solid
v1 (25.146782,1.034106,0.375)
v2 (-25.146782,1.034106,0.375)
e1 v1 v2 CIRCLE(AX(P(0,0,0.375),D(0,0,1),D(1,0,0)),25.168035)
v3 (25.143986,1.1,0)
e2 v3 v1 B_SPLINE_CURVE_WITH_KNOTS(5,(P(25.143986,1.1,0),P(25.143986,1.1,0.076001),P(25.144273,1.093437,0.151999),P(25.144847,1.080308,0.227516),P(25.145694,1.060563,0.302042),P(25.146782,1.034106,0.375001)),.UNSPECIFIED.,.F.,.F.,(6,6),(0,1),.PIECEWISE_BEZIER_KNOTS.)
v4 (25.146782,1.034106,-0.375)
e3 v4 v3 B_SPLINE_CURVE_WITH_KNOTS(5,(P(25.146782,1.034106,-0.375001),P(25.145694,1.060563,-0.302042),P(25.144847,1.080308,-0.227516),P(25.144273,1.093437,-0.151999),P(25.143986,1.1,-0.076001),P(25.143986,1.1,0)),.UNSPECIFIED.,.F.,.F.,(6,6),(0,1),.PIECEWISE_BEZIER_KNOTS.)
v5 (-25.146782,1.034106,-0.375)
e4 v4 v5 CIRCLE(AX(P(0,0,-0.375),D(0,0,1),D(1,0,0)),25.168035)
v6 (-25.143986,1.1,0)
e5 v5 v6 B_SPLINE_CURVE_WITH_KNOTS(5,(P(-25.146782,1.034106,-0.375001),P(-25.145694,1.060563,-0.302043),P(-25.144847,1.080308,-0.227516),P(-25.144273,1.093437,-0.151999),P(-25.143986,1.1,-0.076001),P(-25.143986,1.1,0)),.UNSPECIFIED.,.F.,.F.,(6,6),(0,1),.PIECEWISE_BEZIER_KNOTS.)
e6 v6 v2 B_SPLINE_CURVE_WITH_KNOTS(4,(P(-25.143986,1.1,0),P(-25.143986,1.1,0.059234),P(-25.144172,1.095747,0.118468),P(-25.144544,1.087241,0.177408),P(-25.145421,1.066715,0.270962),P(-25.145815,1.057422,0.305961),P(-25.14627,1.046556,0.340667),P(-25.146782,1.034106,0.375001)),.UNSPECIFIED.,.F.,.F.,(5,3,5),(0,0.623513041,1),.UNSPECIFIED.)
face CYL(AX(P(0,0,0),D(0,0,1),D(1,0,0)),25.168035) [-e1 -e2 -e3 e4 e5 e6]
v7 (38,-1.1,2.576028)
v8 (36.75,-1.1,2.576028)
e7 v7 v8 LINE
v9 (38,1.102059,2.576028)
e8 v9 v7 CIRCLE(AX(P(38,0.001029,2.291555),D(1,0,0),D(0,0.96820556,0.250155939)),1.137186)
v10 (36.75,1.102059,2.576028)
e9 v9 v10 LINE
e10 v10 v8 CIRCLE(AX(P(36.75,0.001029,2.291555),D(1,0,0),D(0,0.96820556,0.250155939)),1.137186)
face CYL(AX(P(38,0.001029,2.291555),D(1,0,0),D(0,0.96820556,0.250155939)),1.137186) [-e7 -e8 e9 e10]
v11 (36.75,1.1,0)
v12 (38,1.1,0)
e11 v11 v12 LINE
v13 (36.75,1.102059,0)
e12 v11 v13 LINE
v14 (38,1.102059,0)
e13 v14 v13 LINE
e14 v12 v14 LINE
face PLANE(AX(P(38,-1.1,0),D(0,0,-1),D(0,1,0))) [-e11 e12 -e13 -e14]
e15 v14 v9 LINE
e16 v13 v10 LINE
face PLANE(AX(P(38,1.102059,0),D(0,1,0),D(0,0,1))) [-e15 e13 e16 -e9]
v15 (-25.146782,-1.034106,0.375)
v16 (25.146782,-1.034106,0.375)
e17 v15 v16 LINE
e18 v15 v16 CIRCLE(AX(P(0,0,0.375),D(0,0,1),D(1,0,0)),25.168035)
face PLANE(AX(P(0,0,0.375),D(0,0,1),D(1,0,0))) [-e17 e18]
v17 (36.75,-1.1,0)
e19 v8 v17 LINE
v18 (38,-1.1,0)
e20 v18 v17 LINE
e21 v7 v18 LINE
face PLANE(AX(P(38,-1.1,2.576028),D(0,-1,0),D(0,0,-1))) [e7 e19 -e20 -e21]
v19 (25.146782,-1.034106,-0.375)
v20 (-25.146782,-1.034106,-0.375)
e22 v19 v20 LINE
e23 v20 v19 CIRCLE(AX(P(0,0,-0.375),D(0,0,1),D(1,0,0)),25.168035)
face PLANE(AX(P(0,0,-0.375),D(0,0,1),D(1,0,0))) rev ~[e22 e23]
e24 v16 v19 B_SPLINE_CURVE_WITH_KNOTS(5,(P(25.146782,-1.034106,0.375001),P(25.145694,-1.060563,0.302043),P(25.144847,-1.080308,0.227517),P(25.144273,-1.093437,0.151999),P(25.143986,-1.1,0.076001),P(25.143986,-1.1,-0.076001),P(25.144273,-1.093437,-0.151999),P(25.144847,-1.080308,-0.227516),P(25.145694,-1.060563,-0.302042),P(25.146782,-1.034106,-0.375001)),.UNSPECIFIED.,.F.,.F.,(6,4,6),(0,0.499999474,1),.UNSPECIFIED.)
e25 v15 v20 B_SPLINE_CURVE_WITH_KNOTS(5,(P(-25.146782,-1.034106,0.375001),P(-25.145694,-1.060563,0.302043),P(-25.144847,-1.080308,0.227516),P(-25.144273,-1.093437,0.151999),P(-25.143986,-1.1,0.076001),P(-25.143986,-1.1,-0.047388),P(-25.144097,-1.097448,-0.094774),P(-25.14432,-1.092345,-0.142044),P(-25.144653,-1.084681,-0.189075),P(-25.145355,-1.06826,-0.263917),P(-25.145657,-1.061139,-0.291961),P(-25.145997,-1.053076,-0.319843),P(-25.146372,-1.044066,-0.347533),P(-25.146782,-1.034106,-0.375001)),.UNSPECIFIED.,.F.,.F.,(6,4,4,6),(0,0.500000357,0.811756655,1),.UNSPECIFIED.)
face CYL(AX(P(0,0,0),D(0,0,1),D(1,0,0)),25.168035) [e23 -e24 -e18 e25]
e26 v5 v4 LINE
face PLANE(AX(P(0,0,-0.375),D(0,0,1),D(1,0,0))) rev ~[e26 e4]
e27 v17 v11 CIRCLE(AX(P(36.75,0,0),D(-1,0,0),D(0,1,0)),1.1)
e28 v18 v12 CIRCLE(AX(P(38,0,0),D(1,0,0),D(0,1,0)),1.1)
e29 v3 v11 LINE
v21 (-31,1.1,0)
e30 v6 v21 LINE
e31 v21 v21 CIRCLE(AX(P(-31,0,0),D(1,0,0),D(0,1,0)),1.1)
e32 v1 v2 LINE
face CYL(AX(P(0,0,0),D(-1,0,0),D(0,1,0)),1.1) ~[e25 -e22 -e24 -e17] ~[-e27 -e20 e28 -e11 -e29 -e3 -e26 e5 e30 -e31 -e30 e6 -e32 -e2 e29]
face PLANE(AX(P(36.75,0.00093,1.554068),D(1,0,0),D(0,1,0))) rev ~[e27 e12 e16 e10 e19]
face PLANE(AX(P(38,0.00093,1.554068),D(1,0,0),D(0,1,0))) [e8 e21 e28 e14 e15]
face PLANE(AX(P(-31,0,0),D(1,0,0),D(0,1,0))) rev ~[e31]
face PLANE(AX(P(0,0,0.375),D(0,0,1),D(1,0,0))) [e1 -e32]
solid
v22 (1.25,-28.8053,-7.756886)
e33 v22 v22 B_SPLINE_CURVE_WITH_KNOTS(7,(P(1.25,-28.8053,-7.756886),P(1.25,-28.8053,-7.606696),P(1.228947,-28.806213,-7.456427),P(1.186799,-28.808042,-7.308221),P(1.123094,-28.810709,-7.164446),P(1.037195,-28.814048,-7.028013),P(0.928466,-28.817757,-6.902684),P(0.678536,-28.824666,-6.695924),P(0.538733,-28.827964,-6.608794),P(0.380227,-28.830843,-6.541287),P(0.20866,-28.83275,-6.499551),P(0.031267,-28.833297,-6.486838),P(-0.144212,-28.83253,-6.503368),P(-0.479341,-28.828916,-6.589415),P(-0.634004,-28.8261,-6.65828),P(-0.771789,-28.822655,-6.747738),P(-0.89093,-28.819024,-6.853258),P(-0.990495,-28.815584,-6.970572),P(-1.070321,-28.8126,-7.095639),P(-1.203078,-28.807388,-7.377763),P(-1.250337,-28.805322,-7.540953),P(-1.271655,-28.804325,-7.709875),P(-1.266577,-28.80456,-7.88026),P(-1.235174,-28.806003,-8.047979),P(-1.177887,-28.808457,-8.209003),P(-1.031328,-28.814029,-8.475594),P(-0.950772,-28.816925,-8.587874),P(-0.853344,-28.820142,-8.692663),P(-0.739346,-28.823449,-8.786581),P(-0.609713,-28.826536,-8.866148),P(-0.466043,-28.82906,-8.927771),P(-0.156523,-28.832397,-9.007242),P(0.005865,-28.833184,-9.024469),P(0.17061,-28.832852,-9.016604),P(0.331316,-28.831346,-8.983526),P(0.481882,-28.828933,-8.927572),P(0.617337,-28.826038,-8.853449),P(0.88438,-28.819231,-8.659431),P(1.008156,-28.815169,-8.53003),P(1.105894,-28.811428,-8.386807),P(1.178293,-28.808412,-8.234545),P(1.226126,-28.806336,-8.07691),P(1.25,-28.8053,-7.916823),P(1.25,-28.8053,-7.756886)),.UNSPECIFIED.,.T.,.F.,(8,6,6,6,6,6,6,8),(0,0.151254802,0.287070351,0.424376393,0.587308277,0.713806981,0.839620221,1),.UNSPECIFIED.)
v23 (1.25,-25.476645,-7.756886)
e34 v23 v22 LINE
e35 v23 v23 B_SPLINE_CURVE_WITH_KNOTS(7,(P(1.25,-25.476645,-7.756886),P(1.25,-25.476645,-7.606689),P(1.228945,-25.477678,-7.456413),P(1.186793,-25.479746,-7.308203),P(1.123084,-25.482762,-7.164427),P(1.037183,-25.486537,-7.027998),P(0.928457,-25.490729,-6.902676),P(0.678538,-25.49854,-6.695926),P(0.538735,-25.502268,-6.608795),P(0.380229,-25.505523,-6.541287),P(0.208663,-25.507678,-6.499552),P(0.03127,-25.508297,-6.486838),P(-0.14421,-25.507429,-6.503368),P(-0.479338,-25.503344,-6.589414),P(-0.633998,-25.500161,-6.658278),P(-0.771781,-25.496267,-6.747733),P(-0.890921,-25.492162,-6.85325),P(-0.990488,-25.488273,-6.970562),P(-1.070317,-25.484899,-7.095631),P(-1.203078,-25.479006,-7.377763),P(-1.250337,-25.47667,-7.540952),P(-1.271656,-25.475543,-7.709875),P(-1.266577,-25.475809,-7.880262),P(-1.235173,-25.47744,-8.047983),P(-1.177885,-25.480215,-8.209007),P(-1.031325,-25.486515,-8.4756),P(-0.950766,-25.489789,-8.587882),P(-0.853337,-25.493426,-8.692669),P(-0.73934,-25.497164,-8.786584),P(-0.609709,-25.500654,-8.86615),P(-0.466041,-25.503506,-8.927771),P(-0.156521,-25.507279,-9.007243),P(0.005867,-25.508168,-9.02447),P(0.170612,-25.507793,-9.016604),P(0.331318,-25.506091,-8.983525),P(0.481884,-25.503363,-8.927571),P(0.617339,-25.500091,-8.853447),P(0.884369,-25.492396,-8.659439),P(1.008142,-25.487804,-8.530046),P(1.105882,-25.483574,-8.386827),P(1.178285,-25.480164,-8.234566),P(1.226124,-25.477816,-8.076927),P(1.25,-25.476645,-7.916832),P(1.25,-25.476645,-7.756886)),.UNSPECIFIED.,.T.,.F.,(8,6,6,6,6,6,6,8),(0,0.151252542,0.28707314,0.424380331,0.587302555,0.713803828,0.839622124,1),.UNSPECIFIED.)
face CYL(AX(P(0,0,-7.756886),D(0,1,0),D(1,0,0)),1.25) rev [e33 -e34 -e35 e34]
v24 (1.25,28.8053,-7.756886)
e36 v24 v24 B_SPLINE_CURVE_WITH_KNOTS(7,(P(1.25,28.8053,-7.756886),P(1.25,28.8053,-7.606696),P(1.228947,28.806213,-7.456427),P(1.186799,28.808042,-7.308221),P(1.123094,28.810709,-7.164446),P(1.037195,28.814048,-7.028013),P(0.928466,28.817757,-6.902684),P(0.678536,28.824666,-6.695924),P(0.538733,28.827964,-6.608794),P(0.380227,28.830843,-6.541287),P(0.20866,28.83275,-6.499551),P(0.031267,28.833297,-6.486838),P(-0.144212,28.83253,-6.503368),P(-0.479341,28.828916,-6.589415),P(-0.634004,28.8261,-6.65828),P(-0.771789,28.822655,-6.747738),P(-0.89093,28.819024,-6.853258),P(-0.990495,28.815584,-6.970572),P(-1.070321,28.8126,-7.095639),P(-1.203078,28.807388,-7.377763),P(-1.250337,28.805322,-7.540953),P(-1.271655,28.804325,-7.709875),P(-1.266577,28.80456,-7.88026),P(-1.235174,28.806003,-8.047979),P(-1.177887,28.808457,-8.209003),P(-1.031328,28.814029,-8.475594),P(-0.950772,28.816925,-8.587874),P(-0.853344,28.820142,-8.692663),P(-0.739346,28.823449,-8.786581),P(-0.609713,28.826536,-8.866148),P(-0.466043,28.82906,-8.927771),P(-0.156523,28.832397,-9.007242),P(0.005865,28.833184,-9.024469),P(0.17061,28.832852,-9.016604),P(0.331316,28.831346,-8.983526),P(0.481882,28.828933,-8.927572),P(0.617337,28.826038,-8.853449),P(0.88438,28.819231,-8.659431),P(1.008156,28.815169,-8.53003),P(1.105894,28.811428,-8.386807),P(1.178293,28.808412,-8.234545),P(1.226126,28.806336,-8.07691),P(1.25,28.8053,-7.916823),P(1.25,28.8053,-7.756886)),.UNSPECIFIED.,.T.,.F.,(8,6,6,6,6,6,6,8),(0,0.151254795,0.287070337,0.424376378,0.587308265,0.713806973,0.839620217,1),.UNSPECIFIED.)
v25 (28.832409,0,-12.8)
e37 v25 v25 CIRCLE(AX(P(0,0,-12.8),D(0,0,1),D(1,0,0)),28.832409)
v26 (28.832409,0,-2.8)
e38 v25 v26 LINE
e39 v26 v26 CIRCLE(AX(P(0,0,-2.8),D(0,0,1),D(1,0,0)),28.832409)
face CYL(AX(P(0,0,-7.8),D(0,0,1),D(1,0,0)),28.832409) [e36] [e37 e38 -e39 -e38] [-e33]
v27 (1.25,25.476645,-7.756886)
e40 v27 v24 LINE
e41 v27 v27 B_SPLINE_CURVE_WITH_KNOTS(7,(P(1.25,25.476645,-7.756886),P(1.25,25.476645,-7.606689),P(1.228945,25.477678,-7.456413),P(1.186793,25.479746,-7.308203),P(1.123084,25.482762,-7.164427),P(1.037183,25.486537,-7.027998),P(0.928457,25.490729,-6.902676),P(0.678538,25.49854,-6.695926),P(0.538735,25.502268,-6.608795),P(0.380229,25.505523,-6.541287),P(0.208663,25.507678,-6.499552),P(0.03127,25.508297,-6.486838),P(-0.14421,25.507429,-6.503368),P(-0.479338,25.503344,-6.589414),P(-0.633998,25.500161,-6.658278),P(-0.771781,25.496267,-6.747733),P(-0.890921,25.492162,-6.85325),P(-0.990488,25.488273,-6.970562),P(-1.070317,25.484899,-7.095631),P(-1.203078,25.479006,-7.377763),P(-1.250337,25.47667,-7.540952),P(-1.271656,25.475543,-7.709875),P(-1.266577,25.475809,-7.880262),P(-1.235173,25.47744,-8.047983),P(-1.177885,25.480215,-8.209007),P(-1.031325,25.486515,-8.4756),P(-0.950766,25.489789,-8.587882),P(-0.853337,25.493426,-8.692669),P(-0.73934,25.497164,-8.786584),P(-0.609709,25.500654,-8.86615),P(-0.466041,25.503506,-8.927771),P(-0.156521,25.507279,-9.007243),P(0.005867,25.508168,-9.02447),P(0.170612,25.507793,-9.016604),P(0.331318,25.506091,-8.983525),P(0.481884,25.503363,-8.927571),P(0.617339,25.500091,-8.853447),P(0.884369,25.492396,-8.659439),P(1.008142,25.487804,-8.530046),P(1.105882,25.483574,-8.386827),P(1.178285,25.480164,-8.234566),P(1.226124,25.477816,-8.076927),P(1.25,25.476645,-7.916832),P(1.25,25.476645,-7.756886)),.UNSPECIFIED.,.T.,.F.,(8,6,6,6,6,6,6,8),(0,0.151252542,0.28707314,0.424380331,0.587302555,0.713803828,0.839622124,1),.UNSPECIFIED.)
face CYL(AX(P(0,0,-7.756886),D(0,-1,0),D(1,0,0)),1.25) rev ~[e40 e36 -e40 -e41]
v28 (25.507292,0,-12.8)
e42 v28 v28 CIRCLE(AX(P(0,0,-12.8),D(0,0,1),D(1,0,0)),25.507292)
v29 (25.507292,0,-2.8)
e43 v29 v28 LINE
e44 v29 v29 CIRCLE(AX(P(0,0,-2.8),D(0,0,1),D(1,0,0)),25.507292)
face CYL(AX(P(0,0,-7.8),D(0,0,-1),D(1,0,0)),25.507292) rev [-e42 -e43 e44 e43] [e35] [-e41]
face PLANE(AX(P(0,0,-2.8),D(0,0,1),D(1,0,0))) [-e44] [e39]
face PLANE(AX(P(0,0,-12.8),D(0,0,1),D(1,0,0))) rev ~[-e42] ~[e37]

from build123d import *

# Parameters (mm, degrees)
F2_R      = 45.8267789271
F0_R      = 28.6708469649
F4_T      = -2.5
F9_R      = 28.8324086219
F9_R_2    = 25.5072919531
F10_DEPTH = 5
F11_R     = 1.25
F12_DEPTH = 28.8334086219
F13_DEPTH = 31
F14_R     = 25.1680354712
F15_DEPTH = 0.375
F16_R     = 1.1
F17_DEPTH = 38
F18_DEPTH = 31
F20_DEPTH = 1.25


# Not quite as in the source:
# - a feature of the source that left no trace in its solid (it failed there, or was rolled back) is left out


with BuildPart() as f3:
    # F2 (on offset) → F3 section 0
    with BuildSketch(Plane.XY.offset(140)):
        with Locations((0, 0.2770116553)):
            Circle(F2_R)
    # F0 (on Top) → F3 section 1
    with BuildSketch(Plane.XY):
        with Locations((0, -0.2653934062)):
            Circle(F0_R)
    loft()

    # F4
    f4_openings = [f3.faces().sort_by_distance(p)[0] for p in [
        (0, 0.277012, 140),
        (0, -0.265393, 0),
    ]]
    offset(amount=F4_T, openings=f4_openings)


with BuildPart() as f10:
    # F9 (on offset) → F10 (new body, symmetric)
    with BuildSketch(Plane.XY.offset(-7.8)):
        Circle(F9_R)
        Circle(F9_R_2, mode=Mode.SUBTRACT)
    extrude(amount=F10_DEPTH, both=True)

    # F11 (on Front) → F12 (cut, through all)
    with BuildSketch(Plane.XZ):
        with Locations((0, -7.7568855078)):
            Circle(F11_R)
    extrude(amount=F12_DEPTH, mode=Mode.SUBTRACT)

    # F11 (on Front) → F13 (cut)
    with BuildSketch(Plane.XZ):
        with Locations((0, -7.7568855078)):
            Circle(F11_R)
    extrude(amount=-F13_DEPTH, mode=Mode.SUBTRACT)


with BuildPart() as f15:
    # F14 (on Top) → F15 (new body, symmetric)
    with BuildSketch(Plane.XY):
        Circle(F14_R)
    extrude(amount=F15_DEPTH, both=True)

    # F16 (on Right) → F17 (join)
    with BuildSketch(Plane.YZ):
        Circle(F16_R)
    extrude(amount=F17_DEPTH)

    # F16 (on Right) → F18 (join)
    with BuildSketch(Plane.YZ):
        Circle(F16_R)
    extrude(amount=-F18_DEPTH)

    # F19 (on face) → F20 (join)
    with BuildSketch(Plane.YZ.offset(38)):
        with BuildLine():
            Line((-1.1, 2.5760282297), (-1.1, 0))
            ThreePointArc((-1.1, 0), (0, 1.1), (1.1, 0))
            Line((1.1, 0), (1.1020586826, 0))
            Line((1.1020586826, 0), (1.1020586826, 2.5760282297))
            ThreePointArc((1.1020586826, 2.5760282297), (0.0010293413, 3.4287400368), (-1.1, 2.5760282297))
        make_face()
        with BuildLine():
            ThreePointArc((1.1, 0), (0, 1.1), (-1.1, 0))
            Line((-1.1, 0), (1.1, 0))
        make_face()
    extrude(amount=-F20_DEPTH)


solid = Compound([f10.part, f15.part])
